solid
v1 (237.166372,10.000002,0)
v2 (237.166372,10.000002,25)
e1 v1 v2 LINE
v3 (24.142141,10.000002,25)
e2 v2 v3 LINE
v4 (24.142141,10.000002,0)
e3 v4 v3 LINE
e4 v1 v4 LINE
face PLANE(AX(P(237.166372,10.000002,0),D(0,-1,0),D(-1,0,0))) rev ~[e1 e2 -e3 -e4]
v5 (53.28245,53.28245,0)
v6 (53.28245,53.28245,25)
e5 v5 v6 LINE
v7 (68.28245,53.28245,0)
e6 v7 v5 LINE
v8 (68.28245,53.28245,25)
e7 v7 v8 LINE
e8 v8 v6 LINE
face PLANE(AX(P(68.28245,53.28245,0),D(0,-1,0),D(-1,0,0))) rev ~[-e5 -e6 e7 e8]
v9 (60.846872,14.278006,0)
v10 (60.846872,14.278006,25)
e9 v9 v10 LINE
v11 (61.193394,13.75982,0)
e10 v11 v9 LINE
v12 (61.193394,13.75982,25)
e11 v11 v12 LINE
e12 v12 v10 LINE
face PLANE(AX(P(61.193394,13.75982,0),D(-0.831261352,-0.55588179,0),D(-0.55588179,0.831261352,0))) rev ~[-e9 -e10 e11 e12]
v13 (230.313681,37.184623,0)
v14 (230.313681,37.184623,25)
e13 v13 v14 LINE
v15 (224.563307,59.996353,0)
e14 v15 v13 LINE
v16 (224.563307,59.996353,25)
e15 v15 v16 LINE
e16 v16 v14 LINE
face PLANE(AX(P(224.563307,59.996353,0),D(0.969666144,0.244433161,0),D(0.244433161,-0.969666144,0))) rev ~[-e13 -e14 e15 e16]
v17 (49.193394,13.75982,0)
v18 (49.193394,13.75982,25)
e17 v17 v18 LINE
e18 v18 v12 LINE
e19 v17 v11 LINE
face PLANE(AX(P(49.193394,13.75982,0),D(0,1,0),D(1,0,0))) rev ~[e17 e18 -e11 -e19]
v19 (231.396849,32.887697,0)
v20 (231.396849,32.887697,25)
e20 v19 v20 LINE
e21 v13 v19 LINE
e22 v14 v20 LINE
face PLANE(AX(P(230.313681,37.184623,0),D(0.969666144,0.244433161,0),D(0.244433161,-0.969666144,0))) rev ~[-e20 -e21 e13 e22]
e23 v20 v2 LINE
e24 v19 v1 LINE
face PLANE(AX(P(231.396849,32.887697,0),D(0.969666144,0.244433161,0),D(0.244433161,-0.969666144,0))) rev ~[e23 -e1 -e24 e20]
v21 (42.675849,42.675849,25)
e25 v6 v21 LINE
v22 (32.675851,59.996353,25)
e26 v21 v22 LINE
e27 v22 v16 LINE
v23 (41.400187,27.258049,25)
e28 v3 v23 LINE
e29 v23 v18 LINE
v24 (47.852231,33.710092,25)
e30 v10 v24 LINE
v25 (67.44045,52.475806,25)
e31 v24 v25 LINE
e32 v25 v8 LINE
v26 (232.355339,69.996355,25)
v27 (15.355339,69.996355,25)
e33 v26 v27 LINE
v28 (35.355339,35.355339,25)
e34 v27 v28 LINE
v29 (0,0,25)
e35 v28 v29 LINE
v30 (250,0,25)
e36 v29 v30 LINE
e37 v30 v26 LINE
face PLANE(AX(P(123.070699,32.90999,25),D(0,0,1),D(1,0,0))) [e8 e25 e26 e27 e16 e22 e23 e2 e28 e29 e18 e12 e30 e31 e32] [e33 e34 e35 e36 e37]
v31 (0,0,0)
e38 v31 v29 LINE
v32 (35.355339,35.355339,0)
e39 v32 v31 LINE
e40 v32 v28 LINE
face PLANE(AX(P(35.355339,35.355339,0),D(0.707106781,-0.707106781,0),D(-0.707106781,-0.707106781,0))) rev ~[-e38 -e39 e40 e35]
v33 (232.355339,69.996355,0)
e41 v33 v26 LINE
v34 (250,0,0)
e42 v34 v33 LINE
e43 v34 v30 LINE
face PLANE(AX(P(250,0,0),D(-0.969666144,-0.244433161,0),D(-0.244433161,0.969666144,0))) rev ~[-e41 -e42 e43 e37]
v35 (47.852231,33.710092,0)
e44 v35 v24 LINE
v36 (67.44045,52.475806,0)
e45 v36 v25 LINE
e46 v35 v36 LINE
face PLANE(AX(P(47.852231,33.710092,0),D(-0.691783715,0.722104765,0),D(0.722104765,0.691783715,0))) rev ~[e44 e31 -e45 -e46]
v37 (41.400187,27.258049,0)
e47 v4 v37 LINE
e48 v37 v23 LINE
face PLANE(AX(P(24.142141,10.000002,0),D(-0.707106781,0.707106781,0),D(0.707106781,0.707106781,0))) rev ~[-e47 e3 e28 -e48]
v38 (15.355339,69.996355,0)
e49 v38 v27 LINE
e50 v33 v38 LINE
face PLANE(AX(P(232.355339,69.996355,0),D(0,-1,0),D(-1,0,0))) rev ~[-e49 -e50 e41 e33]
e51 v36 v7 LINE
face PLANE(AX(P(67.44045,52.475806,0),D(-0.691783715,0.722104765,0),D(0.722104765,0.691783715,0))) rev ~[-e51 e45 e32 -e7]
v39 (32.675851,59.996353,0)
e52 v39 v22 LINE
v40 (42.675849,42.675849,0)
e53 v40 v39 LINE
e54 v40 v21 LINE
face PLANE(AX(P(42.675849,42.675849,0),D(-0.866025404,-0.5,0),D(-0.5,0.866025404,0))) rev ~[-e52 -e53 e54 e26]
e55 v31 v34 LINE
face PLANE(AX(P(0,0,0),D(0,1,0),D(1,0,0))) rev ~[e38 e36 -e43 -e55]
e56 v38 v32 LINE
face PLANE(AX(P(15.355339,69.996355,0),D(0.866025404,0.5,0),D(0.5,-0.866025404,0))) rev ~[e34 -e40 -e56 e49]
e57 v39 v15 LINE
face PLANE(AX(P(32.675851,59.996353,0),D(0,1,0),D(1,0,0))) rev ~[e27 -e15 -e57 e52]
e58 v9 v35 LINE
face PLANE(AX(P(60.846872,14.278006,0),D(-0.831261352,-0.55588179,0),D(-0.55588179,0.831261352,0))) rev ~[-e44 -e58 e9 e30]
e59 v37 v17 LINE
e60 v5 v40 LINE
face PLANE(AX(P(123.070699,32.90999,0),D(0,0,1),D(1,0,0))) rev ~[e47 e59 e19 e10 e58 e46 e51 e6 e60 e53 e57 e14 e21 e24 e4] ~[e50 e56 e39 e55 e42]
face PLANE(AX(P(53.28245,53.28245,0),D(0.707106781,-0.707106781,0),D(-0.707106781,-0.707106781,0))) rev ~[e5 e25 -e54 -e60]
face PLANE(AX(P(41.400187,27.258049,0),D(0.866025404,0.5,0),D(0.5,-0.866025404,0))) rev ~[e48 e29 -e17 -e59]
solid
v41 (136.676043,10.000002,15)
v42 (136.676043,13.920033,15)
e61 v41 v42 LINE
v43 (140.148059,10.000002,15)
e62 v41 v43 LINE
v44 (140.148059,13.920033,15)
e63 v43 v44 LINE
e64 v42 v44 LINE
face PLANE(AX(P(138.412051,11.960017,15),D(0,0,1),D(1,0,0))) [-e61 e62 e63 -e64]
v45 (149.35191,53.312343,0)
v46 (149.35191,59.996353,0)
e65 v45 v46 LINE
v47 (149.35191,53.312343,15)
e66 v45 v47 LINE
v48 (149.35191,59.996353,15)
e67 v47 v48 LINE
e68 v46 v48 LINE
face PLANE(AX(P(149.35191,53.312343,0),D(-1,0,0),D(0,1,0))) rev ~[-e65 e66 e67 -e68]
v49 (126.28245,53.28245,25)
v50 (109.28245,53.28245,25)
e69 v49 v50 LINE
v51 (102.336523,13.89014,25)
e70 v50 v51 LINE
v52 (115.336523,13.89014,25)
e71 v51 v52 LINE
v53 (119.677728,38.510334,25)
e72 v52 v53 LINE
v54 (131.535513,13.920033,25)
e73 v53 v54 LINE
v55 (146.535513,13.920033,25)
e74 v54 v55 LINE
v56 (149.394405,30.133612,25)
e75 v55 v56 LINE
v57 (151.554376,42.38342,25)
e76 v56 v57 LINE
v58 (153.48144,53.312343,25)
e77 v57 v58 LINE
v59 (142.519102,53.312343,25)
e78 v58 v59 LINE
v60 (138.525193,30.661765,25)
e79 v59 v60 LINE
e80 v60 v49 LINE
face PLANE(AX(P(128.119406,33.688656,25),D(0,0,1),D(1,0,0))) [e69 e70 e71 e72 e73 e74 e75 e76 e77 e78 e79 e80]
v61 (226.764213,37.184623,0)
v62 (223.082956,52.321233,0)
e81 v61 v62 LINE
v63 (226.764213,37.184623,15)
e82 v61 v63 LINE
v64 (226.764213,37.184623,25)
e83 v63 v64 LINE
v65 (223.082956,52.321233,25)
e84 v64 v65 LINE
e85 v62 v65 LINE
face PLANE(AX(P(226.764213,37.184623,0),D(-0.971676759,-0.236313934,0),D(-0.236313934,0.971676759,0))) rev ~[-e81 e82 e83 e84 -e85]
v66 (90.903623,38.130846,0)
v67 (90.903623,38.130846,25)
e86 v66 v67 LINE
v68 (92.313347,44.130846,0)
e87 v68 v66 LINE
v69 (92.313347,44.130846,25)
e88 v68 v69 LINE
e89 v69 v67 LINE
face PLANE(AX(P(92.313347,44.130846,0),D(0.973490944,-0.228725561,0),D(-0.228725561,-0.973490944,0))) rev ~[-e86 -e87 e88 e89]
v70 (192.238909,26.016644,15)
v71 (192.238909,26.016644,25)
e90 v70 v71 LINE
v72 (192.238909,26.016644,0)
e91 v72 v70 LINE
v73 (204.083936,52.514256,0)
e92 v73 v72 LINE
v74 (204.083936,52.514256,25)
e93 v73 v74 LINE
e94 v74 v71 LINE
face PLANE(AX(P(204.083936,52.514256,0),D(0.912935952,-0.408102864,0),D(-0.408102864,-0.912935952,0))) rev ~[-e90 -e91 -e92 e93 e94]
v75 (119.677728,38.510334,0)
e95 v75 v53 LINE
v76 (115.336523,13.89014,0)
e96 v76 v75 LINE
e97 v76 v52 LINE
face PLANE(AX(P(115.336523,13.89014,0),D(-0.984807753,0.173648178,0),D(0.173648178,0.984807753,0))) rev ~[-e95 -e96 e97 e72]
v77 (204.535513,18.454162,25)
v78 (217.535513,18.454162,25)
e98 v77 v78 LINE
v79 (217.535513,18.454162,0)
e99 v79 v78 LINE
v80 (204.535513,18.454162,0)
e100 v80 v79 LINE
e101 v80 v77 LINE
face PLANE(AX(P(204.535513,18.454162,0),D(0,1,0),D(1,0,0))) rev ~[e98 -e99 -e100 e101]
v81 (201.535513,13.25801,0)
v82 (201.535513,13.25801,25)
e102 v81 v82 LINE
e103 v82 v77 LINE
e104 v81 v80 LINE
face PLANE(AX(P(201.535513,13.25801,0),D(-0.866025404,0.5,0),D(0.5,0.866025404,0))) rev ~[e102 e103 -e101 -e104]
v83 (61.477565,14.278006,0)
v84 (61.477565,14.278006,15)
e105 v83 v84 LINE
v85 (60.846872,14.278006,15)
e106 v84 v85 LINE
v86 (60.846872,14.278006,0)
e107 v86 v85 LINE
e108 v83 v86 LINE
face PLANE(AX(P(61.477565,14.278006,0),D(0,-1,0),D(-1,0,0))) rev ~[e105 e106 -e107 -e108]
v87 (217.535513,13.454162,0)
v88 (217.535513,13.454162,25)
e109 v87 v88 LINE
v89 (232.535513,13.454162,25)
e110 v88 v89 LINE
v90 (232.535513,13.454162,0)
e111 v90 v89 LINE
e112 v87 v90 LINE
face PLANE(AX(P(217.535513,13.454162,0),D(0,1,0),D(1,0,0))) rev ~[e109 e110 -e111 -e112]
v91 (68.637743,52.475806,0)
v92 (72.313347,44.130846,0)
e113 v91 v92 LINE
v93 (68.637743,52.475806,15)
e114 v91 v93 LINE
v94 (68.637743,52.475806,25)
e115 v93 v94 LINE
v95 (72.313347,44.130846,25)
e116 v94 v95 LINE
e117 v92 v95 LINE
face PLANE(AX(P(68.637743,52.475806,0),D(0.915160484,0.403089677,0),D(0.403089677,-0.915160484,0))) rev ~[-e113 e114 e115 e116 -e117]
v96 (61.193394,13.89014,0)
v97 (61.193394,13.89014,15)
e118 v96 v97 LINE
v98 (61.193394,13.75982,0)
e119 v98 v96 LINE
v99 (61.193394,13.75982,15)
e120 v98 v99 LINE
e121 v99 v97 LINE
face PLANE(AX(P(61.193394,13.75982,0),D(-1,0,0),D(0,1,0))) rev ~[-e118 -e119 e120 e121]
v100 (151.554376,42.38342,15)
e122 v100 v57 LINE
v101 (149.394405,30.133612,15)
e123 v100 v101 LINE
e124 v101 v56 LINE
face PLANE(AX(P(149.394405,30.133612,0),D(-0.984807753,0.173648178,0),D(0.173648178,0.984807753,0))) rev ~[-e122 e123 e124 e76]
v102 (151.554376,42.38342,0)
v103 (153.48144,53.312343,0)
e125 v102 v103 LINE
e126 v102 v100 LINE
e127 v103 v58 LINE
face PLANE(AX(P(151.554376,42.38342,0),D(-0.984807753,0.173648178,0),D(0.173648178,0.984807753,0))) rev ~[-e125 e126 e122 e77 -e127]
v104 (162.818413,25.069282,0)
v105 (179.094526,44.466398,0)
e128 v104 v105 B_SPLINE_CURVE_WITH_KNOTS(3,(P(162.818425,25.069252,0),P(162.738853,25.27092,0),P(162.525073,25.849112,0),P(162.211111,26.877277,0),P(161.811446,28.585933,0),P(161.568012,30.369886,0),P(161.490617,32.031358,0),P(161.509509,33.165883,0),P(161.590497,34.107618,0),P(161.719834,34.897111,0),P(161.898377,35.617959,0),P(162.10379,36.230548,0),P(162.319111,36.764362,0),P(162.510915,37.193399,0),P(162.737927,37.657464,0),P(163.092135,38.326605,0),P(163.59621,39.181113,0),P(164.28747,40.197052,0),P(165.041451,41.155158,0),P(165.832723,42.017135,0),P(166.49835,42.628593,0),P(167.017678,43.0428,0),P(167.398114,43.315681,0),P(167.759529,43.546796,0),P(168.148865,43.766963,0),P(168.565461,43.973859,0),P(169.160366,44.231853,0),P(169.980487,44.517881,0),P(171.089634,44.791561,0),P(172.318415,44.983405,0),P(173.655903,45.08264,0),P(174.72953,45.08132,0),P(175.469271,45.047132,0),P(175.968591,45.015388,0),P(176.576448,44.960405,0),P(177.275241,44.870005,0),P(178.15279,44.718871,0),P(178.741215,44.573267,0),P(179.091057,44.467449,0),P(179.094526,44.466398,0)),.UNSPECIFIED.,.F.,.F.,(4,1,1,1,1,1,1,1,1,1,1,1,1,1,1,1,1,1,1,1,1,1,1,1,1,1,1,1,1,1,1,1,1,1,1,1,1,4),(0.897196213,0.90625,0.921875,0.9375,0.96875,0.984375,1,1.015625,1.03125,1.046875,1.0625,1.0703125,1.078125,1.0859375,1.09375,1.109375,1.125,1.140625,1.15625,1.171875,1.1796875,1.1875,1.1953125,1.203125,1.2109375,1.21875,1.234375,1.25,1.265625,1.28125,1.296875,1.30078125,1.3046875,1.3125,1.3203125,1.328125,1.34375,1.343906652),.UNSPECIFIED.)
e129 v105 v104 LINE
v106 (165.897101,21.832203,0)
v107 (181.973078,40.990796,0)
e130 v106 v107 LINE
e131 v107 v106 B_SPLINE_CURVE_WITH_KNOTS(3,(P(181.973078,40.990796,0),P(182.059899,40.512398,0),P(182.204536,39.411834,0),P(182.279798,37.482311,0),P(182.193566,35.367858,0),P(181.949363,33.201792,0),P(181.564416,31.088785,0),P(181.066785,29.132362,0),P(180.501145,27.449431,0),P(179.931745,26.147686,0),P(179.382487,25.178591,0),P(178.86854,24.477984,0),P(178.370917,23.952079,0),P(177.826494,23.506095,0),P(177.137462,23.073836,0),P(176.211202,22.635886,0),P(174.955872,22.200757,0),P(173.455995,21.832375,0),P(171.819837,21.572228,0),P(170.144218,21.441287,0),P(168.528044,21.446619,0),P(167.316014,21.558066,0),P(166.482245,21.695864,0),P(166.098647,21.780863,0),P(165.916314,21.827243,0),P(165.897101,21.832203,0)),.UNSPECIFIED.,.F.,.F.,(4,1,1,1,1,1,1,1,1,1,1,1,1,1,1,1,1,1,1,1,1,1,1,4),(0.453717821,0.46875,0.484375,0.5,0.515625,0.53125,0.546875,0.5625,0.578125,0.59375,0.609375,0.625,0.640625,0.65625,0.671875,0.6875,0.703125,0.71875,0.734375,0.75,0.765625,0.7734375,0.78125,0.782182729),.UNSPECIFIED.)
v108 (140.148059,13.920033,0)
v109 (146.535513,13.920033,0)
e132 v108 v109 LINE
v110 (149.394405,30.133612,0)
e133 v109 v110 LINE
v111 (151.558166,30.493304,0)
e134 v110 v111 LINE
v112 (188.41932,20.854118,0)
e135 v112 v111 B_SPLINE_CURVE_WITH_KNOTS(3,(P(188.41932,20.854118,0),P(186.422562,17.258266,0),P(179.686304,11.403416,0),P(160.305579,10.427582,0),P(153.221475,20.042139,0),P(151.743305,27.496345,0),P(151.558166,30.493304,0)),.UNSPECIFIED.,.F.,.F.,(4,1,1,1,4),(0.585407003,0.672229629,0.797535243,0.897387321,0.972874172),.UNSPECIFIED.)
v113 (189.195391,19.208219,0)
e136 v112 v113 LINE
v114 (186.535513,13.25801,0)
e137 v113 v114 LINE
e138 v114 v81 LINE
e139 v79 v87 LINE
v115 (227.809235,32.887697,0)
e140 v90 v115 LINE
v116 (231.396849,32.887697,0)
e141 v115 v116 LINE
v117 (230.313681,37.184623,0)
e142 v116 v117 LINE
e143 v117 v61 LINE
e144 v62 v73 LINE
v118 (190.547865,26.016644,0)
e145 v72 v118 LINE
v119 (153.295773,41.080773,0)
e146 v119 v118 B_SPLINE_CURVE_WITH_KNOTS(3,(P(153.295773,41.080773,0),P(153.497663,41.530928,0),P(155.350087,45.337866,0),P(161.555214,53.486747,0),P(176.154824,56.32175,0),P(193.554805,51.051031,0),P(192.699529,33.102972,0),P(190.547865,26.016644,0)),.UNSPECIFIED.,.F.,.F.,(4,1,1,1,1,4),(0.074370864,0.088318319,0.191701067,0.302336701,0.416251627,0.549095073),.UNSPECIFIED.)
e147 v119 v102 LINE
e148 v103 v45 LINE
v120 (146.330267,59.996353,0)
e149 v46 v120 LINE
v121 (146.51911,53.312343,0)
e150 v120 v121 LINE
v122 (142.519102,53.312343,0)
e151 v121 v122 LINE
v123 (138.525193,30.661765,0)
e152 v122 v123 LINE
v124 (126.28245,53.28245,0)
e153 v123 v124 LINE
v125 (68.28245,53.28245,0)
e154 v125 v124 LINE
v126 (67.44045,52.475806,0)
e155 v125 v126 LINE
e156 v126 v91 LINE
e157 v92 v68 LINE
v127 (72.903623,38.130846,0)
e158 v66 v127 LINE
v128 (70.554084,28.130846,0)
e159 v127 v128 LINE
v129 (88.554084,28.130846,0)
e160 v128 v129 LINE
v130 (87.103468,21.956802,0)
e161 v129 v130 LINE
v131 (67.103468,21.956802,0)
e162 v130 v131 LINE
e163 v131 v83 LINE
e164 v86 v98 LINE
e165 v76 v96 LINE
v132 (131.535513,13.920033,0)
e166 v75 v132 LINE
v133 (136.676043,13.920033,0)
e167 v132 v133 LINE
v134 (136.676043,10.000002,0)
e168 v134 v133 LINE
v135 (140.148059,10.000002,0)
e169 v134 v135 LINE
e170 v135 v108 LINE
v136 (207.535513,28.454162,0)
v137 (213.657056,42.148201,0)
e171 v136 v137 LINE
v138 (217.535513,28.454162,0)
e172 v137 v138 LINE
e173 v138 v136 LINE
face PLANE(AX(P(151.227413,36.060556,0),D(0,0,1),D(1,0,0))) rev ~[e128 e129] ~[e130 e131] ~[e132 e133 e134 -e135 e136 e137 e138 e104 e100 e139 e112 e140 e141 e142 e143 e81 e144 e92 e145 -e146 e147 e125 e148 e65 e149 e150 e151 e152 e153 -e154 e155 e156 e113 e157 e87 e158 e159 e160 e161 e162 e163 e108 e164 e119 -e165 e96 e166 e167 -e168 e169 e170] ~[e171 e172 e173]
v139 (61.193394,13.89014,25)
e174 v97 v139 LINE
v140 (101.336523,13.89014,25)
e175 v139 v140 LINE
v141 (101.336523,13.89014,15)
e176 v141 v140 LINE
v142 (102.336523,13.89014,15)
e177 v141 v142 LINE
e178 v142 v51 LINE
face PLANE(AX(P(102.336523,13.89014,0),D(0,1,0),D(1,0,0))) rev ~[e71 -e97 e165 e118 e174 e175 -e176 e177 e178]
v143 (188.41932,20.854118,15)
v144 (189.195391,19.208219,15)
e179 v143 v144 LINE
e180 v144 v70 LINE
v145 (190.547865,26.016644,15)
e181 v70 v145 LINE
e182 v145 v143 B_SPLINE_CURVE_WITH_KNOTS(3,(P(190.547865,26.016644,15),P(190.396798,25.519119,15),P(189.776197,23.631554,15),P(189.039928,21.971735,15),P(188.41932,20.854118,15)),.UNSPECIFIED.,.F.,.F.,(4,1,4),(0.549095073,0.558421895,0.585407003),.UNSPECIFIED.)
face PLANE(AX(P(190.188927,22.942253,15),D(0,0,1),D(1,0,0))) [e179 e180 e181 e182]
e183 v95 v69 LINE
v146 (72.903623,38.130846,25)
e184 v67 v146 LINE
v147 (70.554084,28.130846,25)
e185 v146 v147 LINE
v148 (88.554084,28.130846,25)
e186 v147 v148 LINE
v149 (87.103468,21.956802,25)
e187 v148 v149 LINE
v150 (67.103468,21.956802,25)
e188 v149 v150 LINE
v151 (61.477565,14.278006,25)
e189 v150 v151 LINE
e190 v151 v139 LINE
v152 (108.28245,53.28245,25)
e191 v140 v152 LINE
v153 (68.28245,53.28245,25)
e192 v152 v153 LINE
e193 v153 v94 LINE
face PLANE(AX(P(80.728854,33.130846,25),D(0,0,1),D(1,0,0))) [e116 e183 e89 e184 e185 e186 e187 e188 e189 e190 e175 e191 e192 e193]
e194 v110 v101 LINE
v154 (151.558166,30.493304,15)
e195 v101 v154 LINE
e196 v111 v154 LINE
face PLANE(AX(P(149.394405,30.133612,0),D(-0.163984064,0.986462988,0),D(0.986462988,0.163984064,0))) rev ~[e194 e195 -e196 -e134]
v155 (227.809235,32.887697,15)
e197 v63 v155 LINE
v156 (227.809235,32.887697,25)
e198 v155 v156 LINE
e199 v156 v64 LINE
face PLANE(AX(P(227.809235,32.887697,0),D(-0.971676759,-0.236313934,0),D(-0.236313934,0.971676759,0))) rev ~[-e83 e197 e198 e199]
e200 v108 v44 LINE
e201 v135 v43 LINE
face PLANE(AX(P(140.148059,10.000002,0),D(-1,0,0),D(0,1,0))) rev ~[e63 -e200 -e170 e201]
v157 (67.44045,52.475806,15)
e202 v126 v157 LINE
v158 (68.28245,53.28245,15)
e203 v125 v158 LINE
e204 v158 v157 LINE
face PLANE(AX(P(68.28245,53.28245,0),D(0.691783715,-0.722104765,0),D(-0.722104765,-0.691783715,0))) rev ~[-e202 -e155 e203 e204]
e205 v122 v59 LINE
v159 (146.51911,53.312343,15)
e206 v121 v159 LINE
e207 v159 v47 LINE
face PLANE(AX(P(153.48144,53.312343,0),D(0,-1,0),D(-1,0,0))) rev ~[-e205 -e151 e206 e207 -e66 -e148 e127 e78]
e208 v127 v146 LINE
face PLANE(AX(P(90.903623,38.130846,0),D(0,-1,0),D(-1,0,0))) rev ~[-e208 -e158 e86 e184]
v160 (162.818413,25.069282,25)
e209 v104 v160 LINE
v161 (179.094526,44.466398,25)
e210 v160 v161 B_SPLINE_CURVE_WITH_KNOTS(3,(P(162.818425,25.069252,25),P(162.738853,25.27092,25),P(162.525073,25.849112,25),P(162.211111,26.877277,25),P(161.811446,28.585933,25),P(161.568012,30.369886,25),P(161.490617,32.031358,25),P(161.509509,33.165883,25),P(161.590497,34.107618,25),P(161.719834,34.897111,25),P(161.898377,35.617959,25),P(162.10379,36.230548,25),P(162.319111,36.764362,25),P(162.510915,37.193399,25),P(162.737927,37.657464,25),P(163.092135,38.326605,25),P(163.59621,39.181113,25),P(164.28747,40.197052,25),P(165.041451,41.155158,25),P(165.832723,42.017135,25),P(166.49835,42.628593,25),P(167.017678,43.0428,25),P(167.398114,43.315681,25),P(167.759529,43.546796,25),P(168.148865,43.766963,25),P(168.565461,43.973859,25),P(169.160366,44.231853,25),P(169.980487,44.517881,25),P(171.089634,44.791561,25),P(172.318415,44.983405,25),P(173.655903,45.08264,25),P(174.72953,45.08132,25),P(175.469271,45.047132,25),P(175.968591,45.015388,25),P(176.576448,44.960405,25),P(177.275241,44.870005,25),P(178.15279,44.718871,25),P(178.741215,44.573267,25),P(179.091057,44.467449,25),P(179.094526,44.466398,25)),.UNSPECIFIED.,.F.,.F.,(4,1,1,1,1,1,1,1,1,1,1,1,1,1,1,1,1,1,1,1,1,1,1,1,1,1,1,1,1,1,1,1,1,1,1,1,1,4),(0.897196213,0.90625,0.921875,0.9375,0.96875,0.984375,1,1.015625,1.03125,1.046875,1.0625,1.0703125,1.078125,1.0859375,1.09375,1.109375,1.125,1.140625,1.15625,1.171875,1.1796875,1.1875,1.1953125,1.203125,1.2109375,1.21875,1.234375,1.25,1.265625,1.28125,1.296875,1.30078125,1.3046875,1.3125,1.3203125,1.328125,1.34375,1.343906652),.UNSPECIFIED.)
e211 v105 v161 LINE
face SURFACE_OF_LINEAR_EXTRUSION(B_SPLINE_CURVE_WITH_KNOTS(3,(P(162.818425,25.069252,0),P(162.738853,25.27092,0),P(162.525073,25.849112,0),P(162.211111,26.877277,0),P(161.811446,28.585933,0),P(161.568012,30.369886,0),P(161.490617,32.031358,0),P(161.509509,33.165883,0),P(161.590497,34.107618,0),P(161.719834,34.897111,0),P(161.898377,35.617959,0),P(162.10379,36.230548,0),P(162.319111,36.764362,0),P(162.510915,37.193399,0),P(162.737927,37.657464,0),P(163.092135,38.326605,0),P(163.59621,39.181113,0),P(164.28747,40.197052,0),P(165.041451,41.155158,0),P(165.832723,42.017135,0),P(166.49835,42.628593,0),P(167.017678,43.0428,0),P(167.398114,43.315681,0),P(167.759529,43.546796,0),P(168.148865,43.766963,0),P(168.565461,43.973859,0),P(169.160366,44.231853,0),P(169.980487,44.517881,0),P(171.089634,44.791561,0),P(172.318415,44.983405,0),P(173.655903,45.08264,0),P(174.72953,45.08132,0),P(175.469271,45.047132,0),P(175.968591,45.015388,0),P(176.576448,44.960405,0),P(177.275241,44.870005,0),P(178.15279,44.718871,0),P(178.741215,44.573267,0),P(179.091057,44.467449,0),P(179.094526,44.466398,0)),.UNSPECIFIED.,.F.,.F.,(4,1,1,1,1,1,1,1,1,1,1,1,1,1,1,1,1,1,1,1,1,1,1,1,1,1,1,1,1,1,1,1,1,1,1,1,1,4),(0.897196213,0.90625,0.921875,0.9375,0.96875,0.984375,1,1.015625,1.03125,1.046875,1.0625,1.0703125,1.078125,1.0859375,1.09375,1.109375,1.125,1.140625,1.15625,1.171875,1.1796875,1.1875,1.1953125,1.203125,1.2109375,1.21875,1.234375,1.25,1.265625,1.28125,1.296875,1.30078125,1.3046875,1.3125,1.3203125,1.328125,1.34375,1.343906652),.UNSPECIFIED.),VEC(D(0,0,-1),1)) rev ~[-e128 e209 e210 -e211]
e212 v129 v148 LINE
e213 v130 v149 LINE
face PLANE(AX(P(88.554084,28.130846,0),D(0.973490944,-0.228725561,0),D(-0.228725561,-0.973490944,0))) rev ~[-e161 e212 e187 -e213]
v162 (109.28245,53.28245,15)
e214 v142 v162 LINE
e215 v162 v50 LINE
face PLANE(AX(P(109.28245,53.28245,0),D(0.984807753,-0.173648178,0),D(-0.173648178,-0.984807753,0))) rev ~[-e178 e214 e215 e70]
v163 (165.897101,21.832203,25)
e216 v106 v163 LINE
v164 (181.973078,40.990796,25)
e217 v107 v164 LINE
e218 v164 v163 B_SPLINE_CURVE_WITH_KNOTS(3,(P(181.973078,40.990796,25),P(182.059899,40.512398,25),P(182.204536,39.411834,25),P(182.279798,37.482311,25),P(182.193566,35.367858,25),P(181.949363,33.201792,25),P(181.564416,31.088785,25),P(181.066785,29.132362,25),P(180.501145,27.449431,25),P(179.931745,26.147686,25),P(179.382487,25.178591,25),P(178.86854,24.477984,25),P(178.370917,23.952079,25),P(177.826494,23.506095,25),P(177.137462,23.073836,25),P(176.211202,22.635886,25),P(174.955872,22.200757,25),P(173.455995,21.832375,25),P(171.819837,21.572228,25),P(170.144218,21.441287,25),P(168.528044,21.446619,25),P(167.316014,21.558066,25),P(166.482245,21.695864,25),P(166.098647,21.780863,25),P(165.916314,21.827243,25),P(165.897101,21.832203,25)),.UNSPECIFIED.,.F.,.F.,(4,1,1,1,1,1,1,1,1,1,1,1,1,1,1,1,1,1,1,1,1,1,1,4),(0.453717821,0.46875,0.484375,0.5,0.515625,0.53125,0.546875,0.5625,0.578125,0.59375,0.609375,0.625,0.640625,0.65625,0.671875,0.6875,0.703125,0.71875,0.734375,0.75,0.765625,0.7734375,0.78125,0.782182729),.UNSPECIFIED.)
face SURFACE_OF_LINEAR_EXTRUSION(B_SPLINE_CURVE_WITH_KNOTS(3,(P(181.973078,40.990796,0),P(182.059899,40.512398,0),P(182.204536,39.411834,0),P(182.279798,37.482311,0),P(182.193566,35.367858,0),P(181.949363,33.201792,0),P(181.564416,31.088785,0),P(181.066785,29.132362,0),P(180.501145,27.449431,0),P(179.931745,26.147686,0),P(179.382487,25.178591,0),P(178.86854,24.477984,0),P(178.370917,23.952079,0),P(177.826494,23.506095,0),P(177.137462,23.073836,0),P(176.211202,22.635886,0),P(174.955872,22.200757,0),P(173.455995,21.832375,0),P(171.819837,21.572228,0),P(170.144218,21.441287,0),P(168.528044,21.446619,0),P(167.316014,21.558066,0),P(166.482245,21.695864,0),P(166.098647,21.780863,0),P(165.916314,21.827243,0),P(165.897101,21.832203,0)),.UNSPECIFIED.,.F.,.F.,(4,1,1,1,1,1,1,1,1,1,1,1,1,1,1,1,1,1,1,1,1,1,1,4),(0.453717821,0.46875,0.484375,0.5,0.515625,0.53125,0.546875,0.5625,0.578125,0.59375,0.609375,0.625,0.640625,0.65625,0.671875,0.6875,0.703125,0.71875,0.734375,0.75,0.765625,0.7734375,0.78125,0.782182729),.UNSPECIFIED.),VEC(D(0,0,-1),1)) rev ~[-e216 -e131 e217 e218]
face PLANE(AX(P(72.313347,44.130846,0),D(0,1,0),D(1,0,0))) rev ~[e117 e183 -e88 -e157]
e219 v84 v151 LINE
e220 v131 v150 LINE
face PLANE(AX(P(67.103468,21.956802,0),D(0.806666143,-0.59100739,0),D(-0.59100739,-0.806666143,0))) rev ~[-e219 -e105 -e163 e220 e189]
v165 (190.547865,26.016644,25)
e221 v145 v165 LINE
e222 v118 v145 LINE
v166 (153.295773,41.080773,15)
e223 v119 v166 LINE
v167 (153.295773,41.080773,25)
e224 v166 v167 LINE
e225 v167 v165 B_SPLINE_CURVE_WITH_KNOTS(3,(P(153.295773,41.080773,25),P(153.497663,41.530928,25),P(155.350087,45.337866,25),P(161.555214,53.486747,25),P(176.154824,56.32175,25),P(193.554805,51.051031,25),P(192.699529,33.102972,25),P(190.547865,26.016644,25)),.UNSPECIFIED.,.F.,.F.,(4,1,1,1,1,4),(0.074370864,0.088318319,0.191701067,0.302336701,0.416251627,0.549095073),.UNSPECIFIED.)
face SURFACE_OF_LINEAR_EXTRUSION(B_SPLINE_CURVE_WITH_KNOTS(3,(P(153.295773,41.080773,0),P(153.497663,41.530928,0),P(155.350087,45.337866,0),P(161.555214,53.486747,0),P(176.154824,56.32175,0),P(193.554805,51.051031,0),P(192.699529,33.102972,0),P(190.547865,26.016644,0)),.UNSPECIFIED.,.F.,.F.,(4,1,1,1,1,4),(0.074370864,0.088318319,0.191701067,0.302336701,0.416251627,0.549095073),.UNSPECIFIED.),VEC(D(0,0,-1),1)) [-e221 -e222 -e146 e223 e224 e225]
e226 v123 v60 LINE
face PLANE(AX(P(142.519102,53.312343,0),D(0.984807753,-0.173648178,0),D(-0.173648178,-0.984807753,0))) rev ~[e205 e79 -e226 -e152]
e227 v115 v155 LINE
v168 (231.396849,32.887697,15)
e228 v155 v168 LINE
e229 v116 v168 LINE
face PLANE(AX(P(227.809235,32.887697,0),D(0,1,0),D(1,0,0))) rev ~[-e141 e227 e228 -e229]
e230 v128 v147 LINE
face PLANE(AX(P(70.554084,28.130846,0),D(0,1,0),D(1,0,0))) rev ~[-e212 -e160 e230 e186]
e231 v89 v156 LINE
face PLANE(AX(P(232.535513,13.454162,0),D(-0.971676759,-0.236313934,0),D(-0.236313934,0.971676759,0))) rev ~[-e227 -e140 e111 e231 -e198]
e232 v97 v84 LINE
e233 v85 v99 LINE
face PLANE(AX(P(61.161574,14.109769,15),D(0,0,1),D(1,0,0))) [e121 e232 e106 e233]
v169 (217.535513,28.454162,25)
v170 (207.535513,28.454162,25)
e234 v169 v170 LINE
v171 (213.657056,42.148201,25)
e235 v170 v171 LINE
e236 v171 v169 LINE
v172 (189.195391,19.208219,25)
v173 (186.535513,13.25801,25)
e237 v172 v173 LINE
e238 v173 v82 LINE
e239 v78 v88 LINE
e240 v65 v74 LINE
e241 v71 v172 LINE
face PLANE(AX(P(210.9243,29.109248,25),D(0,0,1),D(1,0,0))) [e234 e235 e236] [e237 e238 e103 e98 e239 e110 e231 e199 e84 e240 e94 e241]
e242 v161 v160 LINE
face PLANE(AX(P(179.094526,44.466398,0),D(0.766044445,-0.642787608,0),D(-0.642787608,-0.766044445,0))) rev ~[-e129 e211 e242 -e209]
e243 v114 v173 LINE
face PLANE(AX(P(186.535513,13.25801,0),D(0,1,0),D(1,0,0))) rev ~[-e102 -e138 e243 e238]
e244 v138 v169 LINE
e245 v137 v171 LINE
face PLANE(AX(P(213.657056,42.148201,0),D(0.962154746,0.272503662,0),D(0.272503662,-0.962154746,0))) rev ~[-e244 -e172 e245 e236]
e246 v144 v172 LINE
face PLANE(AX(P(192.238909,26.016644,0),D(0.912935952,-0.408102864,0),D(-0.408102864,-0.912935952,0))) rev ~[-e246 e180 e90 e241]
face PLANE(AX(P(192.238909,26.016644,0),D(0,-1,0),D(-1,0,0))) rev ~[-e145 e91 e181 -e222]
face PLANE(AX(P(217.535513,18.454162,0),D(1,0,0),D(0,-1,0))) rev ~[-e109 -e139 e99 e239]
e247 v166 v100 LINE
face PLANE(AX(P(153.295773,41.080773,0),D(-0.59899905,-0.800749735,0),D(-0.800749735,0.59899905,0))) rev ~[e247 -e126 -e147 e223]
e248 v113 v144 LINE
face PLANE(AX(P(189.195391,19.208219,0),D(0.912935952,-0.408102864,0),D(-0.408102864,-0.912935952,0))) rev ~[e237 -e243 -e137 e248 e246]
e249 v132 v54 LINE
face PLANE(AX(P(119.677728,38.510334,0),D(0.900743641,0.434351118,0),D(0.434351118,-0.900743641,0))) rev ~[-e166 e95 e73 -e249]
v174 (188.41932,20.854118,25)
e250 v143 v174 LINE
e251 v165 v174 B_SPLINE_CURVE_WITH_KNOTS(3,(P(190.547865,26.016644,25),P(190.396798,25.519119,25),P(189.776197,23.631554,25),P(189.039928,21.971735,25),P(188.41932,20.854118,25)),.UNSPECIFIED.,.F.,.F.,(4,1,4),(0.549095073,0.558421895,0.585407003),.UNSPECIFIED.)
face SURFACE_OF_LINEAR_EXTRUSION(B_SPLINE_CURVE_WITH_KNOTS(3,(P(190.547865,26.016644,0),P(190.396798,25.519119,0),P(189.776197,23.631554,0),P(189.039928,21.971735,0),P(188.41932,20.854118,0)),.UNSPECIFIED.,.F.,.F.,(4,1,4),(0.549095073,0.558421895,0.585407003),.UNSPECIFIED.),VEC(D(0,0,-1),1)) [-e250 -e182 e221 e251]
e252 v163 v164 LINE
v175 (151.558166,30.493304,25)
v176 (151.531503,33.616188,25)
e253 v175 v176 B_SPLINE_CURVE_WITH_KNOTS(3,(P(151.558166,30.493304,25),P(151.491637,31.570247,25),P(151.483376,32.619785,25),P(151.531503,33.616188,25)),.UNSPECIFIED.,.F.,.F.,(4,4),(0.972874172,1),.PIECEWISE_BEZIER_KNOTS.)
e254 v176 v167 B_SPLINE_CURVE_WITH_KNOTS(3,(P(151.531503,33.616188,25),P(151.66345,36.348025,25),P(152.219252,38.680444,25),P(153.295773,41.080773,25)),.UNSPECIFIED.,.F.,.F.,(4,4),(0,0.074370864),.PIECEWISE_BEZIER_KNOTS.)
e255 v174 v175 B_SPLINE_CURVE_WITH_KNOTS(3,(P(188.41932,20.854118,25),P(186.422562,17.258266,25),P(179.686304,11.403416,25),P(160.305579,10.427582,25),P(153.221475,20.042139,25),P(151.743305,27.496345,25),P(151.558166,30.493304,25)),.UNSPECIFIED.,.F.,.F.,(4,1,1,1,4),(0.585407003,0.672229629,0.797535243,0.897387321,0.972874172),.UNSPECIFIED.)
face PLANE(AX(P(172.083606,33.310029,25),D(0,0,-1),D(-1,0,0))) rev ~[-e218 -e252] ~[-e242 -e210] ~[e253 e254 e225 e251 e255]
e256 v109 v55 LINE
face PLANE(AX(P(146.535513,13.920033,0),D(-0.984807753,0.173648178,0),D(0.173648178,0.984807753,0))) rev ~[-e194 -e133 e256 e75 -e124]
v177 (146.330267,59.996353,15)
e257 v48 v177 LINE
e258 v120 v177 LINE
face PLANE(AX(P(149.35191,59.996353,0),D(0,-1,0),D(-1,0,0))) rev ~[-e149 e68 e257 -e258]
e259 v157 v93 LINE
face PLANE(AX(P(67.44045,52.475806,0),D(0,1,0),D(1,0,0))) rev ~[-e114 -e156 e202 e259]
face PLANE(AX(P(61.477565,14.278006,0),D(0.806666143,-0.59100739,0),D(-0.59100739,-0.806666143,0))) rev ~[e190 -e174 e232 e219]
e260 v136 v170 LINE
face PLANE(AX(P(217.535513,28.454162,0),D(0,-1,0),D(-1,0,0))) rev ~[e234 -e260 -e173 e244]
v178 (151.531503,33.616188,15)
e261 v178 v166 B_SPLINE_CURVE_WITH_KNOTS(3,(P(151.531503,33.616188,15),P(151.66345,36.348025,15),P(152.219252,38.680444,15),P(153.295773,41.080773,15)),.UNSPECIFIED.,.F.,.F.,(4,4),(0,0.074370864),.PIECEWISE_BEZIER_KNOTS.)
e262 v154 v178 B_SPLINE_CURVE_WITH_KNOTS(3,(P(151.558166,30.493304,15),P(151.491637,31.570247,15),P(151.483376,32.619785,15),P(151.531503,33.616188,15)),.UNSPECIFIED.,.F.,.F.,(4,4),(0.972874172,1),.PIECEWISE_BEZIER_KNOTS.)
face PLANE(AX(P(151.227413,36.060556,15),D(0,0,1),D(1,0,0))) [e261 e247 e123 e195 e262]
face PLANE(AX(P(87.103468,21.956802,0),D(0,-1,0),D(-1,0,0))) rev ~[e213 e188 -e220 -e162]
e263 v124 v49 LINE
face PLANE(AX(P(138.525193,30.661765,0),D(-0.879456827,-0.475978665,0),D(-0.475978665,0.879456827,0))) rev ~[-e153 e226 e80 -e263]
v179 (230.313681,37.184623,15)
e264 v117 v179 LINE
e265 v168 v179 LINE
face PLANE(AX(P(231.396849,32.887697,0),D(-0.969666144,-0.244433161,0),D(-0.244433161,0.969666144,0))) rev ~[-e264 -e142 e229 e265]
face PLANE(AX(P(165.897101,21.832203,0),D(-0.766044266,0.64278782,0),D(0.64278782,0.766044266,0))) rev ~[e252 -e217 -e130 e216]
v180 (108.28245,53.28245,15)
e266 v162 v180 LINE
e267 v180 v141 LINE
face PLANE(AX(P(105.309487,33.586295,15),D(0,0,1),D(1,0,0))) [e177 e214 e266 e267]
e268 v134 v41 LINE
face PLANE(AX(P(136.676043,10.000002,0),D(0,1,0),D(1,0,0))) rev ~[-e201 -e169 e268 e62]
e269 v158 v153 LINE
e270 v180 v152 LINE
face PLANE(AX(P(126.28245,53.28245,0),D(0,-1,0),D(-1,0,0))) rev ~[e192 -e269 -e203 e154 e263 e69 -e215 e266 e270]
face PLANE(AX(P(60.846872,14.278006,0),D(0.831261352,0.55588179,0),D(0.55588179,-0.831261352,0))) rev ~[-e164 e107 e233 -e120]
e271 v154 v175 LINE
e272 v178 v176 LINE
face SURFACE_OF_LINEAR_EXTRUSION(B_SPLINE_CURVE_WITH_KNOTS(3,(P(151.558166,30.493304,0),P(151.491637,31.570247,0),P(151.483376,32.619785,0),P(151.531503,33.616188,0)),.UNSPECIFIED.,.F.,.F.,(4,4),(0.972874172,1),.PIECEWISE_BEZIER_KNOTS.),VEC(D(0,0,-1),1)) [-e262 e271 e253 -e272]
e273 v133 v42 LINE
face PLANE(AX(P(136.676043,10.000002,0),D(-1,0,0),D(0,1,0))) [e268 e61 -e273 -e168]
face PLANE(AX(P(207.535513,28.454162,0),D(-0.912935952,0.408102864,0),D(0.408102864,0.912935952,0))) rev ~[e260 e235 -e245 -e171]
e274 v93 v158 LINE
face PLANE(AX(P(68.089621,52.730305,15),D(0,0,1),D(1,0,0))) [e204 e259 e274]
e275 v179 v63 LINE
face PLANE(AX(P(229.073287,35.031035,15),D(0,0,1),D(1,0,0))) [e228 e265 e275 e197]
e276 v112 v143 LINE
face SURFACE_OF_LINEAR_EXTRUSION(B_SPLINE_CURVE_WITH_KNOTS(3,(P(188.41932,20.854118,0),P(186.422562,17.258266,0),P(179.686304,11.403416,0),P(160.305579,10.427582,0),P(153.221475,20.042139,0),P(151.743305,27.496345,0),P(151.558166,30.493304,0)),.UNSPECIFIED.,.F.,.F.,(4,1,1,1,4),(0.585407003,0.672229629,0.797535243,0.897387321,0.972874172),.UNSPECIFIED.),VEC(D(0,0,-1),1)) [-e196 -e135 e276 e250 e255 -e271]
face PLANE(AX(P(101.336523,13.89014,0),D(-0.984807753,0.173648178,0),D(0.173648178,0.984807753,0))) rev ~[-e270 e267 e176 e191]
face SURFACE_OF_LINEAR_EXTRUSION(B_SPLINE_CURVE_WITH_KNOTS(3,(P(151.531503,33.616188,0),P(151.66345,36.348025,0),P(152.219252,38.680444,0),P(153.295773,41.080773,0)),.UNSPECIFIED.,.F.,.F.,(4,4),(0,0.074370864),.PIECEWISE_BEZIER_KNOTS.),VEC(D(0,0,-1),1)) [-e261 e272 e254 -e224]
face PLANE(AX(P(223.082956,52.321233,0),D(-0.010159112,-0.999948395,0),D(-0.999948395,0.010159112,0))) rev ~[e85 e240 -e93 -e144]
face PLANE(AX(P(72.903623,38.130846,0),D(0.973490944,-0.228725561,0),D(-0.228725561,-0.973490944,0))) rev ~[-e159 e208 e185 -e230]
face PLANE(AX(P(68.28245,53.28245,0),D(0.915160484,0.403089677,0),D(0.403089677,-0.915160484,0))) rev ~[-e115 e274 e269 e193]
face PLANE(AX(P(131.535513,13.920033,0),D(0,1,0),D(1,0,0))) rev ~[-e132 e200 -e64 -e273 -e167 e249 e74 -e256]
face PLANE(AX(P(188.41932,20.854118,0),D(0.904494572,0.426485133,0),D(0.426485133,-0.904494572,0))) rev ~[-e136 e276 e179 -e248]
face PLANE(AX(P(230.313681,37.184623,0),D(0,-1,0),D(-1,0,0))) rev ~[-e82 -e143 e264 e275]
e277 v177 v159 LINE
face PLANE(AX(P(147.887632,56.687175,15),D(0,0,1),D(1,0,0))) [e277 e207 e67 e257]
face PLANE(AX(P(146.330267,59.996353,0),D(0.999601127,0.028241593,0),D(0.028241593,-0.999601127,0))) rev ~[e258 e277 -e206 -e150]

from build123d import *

# Parameters (mm, degrees)
F1_DEPTH = 25
F0_W     = 3.4720152617
F0_H     = 3.9200305776
F2_DEPTH = 15


# Not quite as in the source:
# - ends of sketch curves that miss each other by under 0.0002 mm in the source are joined
# - the dataset's text gives a spline's control points without its knots; the knots are read off the source's solid
# - a feature names something its author has since deleted; it is built from what else it names


with BuildPart() as f1:
    # F0 (on Top) → F1 (new body)
    with BuildSketch(Plane.XY):
        Polygon((35.3553390593, 35.3553390593), (0, 0), (250, 0), (232.3553390593, 69.9963552107), (15.3553390593, 69.9963552107), align=None)
        Polygon((149.3519097567, 59.9963530121), (224.56330661, 59.9963530121), (230.3136809852, 37.1846226695), (231.3968486735, 32.8876973548), (237.166372237, 10.0000021986), (140.1480585337, 10.0000021986), (136.676043272, 10.0000021986), (24.1421409317, 10.0000021986), (41.4001874912, 27.2580487582), (47.8522307846, 33.7100920516), (42.6758487445, 42.6758487445), (32.6758509431, 59.9963530121), (146.3302671909, 59.9963530121), align=None, mode=Mode.SUBTRACT)
        Polygon((53.2824504623, 53.2824504623), (42.6758487445, 42.6758487445), (47.8522307846, 33.7100920516), (67.4404504829, 52.4758059113), (68.2824504623, 53.2824504623), align=None)
        Polygon((60.8468717116, 14.278005959), (47.8522307846, 33.7100920516), (41.4001874912, 27.2580487582), (49.1933937334, 13.7598195929), (61.1933937334, 13.7598195929), align=None)
    extrude(amount=F1_DEPTH)


with BuildPart() as f1b:
    # F0 (on Top) → F1, piece 2 (new body)
    with BuildSketch(Plane.XY):
        Polygon((88.5540837341, 28.1308456181), (90.9036234209, 38.1308456181), (72.9036234209, 38.1308456181), (70.5540837341, 28.1308456181), align=None)
        Polygon((108.2824504623, 53.2824504623), (68.2824504623, 53.2824504623), (68.6377434378, 52.4758059113), (72.313347233, 44.1308456181), (92.313347233, 44.1308456181), (90.9036234209, 38.1308456181), (88.5540837341, 28.1308456181), (87.1034676285, 21.9568017674), (67.1034676285, 21.9568017674), (61.477565132, 14.278005959), (61.1933937334, 13.8901403418), (101.3365233556, 13.8901403418), align=None)
    extrude(amount=F1_DEPTH)



with BuildPart() as f1c:
    # F0 (on Top) → F1, piece 3 (new body)
    with BuildSketch(Plane.XY):
        Polygon((153.4814404268, 53.3123428967), (149.3519097567, 53.3123428967), (146.5191096067, 53.3123428967), (142.5191015005, 53.3123428967), (138.5251934142, 30.6617645774), (126.2824504623, 53.2824504623), (109.2824504623, 53.2824504623), (102.3365233556, 13.8901403418), (115.3365233556, 13.8901403418), (119.6777277973, 38.5103341671), (131.5355133201, 13.9200327762), (136.676043272, 13.9200327762), (140.1480585337, 13.9200327762), (146.5355133201, 13.9200327762), (149.3944048747, 30.1336124743), (151.5543764817, 42.3834201799), align=None)
    extrude(amount=F1_DEPTH)


with BuildPart() as f1d:
    # F0 (on Top) → F1, piece 4 (new body)
    with BuildSketch(Plane.XY):
        with BuildLine():
            add(Edge.make_bspline(
                [(153.2957728652, 41.0807725054), (153.49766281, 41.5309282211), (155.3500865512, 45.3378659555), (161.5552143615, 53.4867465492), (176.1548241084, 56.3217499328), (193.5548048204, 51.0510310034), (192.6995287251, 33.1029715051), (190.5478645245, 26.016644206)],
                knots=[0.0743708641, 0.0743708641, 0.0743708641, 0.0743708641, 0.0883183193, 0.1917010674, 0.3023367007, 0.4162516271, 0.5490950731, 0.5490950731, 0.5490950731, 0.5490950731], degree=3))
            add(Edge.make_bspline(
                [(151.5315026045, 33.6161878365), (151.6634499925, 36.3480245715), (152.2192517782, 38.6804443414), (153.2957728652, 41.0807725054)],
                knots=[0, 0, 0, 0, 0.0743708641, 0.0743708641, 0.0743708641, 0.0743708641], degree=3))
            add(Edge.make_bspline(
                [(151.5581660211, 30.4933039686), (151.4916370849, 31.5702465606), (151.4833764702, 32.6197850769), (151.5315026045, 33.6161878365)],
                knots=[0.9728741717, 0.9728741717, 0.9728741717, 0.9728741717, 1, 1, 1, 1], degree=3))
            add(Edge.make_bspline(
                [(188.4193204432, 20.8541177869), (186.4225620314, 17.2582664486), (179.6863041093, 11.4034157724), (160.3055787763, 10.4275817806), (153.2214749313, 20.0421386094), (151.7433054324, 27.4963446143), (151.5581660211, 30.4933039686)],
                knots=[0.5854070027, 0.5854070027, 0.5854070027, 0.5854070027, 0.6722296295, 0.7975352428, 0.8973873208, 0.9728741717, 0.9728741717, 0.9728741717, 0.9728741717], degree=3))
            add(Edge.make_bspline(
                [(190.5478645245, 26.016644206), (190.3967980643, 25.5191193687), (189.7761974015, 23.6315541865), (189.0399275657, 21.9717346898), (188.4193204432, 20.8541177869)],
                knots=[0.5490950731, 0.5490950731, 0.5490950731, 0.5490950731, 0.5584218951, 0.5854070027, 0.5854070027, 0.5854070027, 0.5854070027], degree=3))
        make_face()
        with BuildLine():
            add(Edge.make_bspline(
                [(162.8184250503, 25.0692523461), (162.7388528349, 25.2709199434), (162.5250729743, 25.8491123795), (162.2111113791, 26.8772771924), (161.811446171, 28.5859325459), (161.5680124914, 30.3698864013), (161.490617043, 32.0313577817), (161.5032118997, 32.7877081125), (161.5198585813, 33.1337514359)],
                knots=[0.8971962129, 0.8971962129, 0.8971962129, 0.8971962129, 0.90625, 0.921875, 0.9375, 0.96875, 0.984375, 1, 1, 1, 1], degree=3))
            add(Edge.make_bspline(
                [(161.5198585813, 33.1337514359), (161.5365052629, 33.4797947593), (161.5904971328, 34.1076177221), (161.7198338174, 34.8971109654), (161.8983772283, 35.617959176), (162.1037900469, 36.2305480911), (162.3191108206, 36.7643620724), (162.5109148317, 37.1933987719), (162.7379267984, 37.6574642255), (163.0921353714, 38.326605495), (163.596210236, 39.1811127594), (164.287470415, 40.1970519056), (165.0414513207, 41.1551577869), (165.8327231283, 42.017135319), (166.4983498938, 42.6285934344), (167.0176778213, 43.0428000772), (167.3981141086, 43.3156806379), (167.7595288983, 43.5467960735), (168.1488651256, 43.766963423), (168.5654607343, 43.9738592368), (169.1603655772, 44.23185257), (169.9804869671, 44.5178805652), (171.0896341478, 44.7915612101), (172.3184150489, 44.9834054828), (173.6559028444, 45.0826399089), (174.7295299917, 45.0813201083), (175.4692709806, 45.0471315589), (175.9685909899, 45.0153875781), (176.5764482855, 44.960404607), (177.2752413398, 44.8700053931), (178.152789541, 44.7188709988), (178.7412145092, 44.5732668808), (179.0910574906, 44.4674492213), (179.0945257888, 44.4663980322)],
                knots=[0, 0, 0, 0, 0.015625, 0.03125, 0.046875, 0.0625, 0.0703125, 0.078125, 0.0859375, 0.09375, 0.109375, 0.125, 0.140625, 0.15625, 0.171875, 0.1796875, 0.1875, 0.1953125, 0.203125, 0.2109375, 0.21875, 0.234375, 0.25, 0.265625, 0.28125, 0.296875, 0.30078125, 0.3046875, 0.3125, 0.3203125, 0.328125, 0.34375, 0.3439066519, 0.3439066519, 0.3439066519, 0.3439066519], degree=3))
            add(Edge.make_bspline(
                [(179.0945257888, 44.4663980322), (179.4369974189, 44.3626000224), (180.0408289592, 44.137858269), (180.6603332198, 43.8043498556), (180.954614815, 43.5775919437), (181.1038370269, 43.4315691806), (181.1895827034, 43.3310307887), (181.2538264485, 43.2395291398), (181.3046724038, 43.1550069204), (181.3582155541, 43.05569095), (181.422796919, 42.9212624239), (181.5199173994, 42.6948431225), (181.7085595453, 42.1772024114), (181.8753089955, 41.5231873988), (181.9696544415, 41.0096622148), (181.9730783847, 40.9907957298)],
                knots=[0.3439066519, 0.3439066519, 0.3439066519, 0.3439066519, 0.359375, 0.375, 0.390625, 0.3984375, 0.40625, 0.4140625, 0.41796875, 0.421875, 0.42578125, 0.4296875, 0.4375, 0.453125, 0.4537178211, 0.4537178211, 0.4537178211, 0.4537178211], degree=3))
            add(Edge.make_bspline(
                [(181.9730783847, 40.9907957298), (182.0598994005, 40.512397778), (182.2045363428, 39.41183358), (182.2797979507, 37.4823107399), (182.193566141, 35.3678582229), (181.9493626032, 33.2017921364), (181.5644163989, 31.0887847577), (181.0667847965, 29.1323622869), (180.5011449009, 27.4494312491), (179.9317447836, 26.1476864655), (179.3824865747, 25.1785905134), (178.8685398921, 24.4779841747), (178.3709172748, 23.9520794031), (177.8264944089, 23.5060953751), (177.1374617731, 23.0738355235), (176.2112022482, 22.6358864412), (174.9558716393, 22.2007569681), (173.4559950281, 21.8323747048), (171.8198374216, 21.5722282716), (170.1442177268, 21.4412866926), (168.5280439261, 21.4466193999), (167.3160139795, 21.558065936), (166.4822451641, 21.6958640201), (166.0986472535, 21.7808626756), (165.9163137021, 21.8272428827), (165.8971010414, 21.8322026836)],
                knots=[0.4537178211, 0.4537178211, 0.4537178211, 0.4537178211, 0.46875, 0.484375, 0.5, 0.515625, 0.53125, 0.546875, 0.5625, 0.578125, 0.59375, 0.609375, 0.625, 0.640625, 0.65625, 0.671875, 0.6875, 0.703125, 0.71875, 0.734375, 0.75, 0.765625, 0.7734375, 0.78125, 0.7821827292, 0.7821827292, 0.7821827292, 0.7821827292], degree=3))
            add(Edge.make_bspline(
                [(165.8971010414, 21.8322026836), (165.7553892759, 21.868785963), (165.5531970067, 21.9272567748), (165.3254056153, 22.0041417656), (165.1739060305, 22.0612615773), (165.0494707627, 22.1134592968), (164.8977695401, 22.1837784003), (164.7376634219, 22.2699020236), (164.5740601511, 22.3743238889), (164.3757102389, 22.5229923761), (164.1329229874, 22.7478764528), (163.795317607, 23.1578632169), (163.4078371213, 23.7696356085), (163.0732924198, 24.4470716455), (162.8761783378, 24.9228825776), (162.8184250503, 25.0692523461)],
                knots=[0.7821827292, 0.7821827292, 0.7821827292, 0.7821827292, 0.7890625, 0.79296875, 0.796875, 0.80078125, 0.8046875, 0.8125, 0.8203125, 0.828125, 0.84375, 0.859375, 0.875, 0.890625, 0.8971962129, 0.8971962129, 0.8971962129, 0.8971962129], degree=3))
        make_face(mode=Mode.SUBTRACT)
        with BuildLine():
            add(Edge.make_bspline(
                [(179.0945257888, 44.4663980322), (179.4369974189, 44.3626000224), (180.0408289592, 44.137858269), (180.6603332198, 43.8043498556), (180.954614815, 43.5775919437), (181.1038370269, 43.4315691806), (181.1895827034, 43.3310307887), (181.2538264485, 43.2395291398), (181.3046724038, 43.1550069204), (181.3582155541, 43.05569095), (181.422796919, 42.9212624239), (181.5199173994, 42.6948431225), (181.7085595453, 42.1772024114), (181.8753089955, 41.5231873988), (181.9696544415, 41.0096622148), (181.9730783847, 40.9907957298)],
                knots=[0.3439066519, 0.3439066519, 0.3439066519, 0.3439066519, 0.359375, 0.375, 0.390625, 0.3984375, 0.40625, 0.4140625, 0.41796875, 0.421875, 0.42578125, 0.4296875, 0.4375, 0.453125, 0.4537178211, 0.4537178211, 0.4537178211, 0.4537178211], degree=3))
            Line((179.0945257888, 44.4663980322), (162.8183697977, 25.0692305451))
            add(Edge.make_bspline(
                [(165.8971010414, 21.8322026836), (165.7553892759, 21.868785963), (165.5531970067, 21.9272567748), (165.3254056153, 22.0041417656), (165.1739060305, 22.0612615773), (165.0494707627, 22.1134592968), (164.8977695401, 22.1837784003), (164.7376634219, 22.2699020236), (164.5740601511, 22.3743238889), (164.3757102389, 22.5229923761), (164.1329229874, 22.7478764528), (163.795317607, 23.1578632169), (163.4078371213, 23.7696356085), (163.0732924198, 24.4470716455), (162.8761783378, 24.9228825776), (162.8183697977, 25.0692305451)],
                knots=[0.7821827292, 0.7821827292, 0.7821827292, 0.7821827292, 0.7890625, 0.79296875, 0.796875, 0.80078125, 0.8046875, 0.8125, 0.8203125, 0.828125, 0.84375, 0.859375, 0.875, 0.890625, 0.8971962129, 0.8971962129, 0.8971962129, 0.8971962129], degree=3))
            Line((165.8971010414, 21.8322026836), (181.9730783847, 40.9907957298))
        make_face()
    extrude(amount=F1_DEPTH)


with BuildPart() as f1e:
    # F0 (on Top) → F1, piece 5 (new body)
    with BuildSketch(Plane.XY):
        Polygon((227.8092346476, 32.8876973548), (226.7642129222, 37.1846226695), (223.0829559751, 52.321232543), (204.0839364723, 52.5142556785), (192.2389093289, 26.016644206), (189.1953905746, 19.20821933), (186.5355133201, 13.258009744), (201.5355133201, 13.258009744), (204.5355133201, 18.4541621667), (217.5355133201, 18.4541621667), (217.5355133201, 13.4541621667), (232.5355133201, 13.4541621667), align=None)
        Polygon((213.6570562804, 42.148201446), (217.5355133201, 28.4541621667), (207.5355133201, 28.4541621667), align=None, mode=Mode.SUBTRACT)
    extrude(amount=F1_DEPTH)


with BuildPart() as f1b_1:
    add(f1b.part)

    add(f1c.part)  # F2 merges F1c

    add(f1d.part)  # F2 merges F1d

    add(f1e.part)  # F2 merges F1e
    # F0 (on Top) → F2 (join)
    with BuildSketch(Plane.XY):
        Polygon((149.3519097567, 53.3123428967), (149.3519097567, 59.9963530121), (146.3302671909, 59.9963530121), (146.5191096067, 53.3123428967), align=None)
        with Locations((138.4120509028, 11.9600174874)):
            Rectangle(F0_W, F0_H)
        with BuildLine():
            Line((153.2957728652, 41.0807725054), (151.5543764817, 42.3834201799))
            Line((151.5543764817, 42.3834201799), (149.3944048747, 30.1336124743))
            Line((149.3944048747, 30.1336124743), (151.5581660211, 30.4933039686))
            add(Edge.make_bspline(
                [(151.5581660211, 30.4933039686), (151.4916370849, 31.5702465606), (151.4833764702, 32.6197850769), (151.5315026045, 33.6161878365)],
                knots=[0.9728741717, 0.9728741717, 0.9728741717, 0.9728741717, 1, 1, 1, 1], degree=3))
            add(Edge.make_bspline(
                [(151.5315026045, 33.6161878365), (151.6634499925, 36.3480245715), (152.2192517782, 38.6804443414), (153.2957728652, 41.0807725054)],
                knots=[0, 0, 0, 0, 0.0743708641, 0.0743708641, 0.0743708641, 0.0743708641], degree=3))
        make_face()
        with BuildLine():
            Line((189.1953905746, 19.20821933), (192.2389093289, 26.016644206))
            Line((192.2389093289, 26.016644206), (190.5478645245, 26.016644206))
            add(Edge.make_bspline(
                [(190.5478645245, 26.016644206), (190.3967980643, 25.5191193687), (189.7761974015, 23.6315541865), (189.0399275657, 21.9717346898), (188.4193204432, 20.8541177869)],
                knots=[0.5490950731, 0.5490950731, 0.5490950731, 0.5490950731, 0.5584218951, 0.5854070027, 0.5854070027, 0.5854070027, 0.5854070027], degree=3))
            Line((188.4193204432, 20.8541177869), (189.1953905746, 19.20821933))
        make_face()
        Polygon((231.3968486735, 32.8876973548), (230.3136809852, 37.1846226695), (226.7642129222, 37.1846226695), (227.8092346476, 32.8876973548), align=None)
        Polygon((109.2824504623, 53.2824504623), (108.2824504623, 53.2824504623), (101.3365233556, 13.8901403418), (102.3365233556, 13.8901403418), align=None)
        Polygon((61.477565132, 14.278005959), (60.8468717116, 14.278005959), (61.1933937334, 13.7598195929), (61.1933937334, 13.8901403418), align=None)
        Polygon((68.2824504623, 53.2824504623), (67.4404504829, 52.4758059113), (68.6377434378, 52.4758059113), align=None)
    extrude(amount=F2_DEPTH)


solid = Compound([f1.part, f1b_1.part])
